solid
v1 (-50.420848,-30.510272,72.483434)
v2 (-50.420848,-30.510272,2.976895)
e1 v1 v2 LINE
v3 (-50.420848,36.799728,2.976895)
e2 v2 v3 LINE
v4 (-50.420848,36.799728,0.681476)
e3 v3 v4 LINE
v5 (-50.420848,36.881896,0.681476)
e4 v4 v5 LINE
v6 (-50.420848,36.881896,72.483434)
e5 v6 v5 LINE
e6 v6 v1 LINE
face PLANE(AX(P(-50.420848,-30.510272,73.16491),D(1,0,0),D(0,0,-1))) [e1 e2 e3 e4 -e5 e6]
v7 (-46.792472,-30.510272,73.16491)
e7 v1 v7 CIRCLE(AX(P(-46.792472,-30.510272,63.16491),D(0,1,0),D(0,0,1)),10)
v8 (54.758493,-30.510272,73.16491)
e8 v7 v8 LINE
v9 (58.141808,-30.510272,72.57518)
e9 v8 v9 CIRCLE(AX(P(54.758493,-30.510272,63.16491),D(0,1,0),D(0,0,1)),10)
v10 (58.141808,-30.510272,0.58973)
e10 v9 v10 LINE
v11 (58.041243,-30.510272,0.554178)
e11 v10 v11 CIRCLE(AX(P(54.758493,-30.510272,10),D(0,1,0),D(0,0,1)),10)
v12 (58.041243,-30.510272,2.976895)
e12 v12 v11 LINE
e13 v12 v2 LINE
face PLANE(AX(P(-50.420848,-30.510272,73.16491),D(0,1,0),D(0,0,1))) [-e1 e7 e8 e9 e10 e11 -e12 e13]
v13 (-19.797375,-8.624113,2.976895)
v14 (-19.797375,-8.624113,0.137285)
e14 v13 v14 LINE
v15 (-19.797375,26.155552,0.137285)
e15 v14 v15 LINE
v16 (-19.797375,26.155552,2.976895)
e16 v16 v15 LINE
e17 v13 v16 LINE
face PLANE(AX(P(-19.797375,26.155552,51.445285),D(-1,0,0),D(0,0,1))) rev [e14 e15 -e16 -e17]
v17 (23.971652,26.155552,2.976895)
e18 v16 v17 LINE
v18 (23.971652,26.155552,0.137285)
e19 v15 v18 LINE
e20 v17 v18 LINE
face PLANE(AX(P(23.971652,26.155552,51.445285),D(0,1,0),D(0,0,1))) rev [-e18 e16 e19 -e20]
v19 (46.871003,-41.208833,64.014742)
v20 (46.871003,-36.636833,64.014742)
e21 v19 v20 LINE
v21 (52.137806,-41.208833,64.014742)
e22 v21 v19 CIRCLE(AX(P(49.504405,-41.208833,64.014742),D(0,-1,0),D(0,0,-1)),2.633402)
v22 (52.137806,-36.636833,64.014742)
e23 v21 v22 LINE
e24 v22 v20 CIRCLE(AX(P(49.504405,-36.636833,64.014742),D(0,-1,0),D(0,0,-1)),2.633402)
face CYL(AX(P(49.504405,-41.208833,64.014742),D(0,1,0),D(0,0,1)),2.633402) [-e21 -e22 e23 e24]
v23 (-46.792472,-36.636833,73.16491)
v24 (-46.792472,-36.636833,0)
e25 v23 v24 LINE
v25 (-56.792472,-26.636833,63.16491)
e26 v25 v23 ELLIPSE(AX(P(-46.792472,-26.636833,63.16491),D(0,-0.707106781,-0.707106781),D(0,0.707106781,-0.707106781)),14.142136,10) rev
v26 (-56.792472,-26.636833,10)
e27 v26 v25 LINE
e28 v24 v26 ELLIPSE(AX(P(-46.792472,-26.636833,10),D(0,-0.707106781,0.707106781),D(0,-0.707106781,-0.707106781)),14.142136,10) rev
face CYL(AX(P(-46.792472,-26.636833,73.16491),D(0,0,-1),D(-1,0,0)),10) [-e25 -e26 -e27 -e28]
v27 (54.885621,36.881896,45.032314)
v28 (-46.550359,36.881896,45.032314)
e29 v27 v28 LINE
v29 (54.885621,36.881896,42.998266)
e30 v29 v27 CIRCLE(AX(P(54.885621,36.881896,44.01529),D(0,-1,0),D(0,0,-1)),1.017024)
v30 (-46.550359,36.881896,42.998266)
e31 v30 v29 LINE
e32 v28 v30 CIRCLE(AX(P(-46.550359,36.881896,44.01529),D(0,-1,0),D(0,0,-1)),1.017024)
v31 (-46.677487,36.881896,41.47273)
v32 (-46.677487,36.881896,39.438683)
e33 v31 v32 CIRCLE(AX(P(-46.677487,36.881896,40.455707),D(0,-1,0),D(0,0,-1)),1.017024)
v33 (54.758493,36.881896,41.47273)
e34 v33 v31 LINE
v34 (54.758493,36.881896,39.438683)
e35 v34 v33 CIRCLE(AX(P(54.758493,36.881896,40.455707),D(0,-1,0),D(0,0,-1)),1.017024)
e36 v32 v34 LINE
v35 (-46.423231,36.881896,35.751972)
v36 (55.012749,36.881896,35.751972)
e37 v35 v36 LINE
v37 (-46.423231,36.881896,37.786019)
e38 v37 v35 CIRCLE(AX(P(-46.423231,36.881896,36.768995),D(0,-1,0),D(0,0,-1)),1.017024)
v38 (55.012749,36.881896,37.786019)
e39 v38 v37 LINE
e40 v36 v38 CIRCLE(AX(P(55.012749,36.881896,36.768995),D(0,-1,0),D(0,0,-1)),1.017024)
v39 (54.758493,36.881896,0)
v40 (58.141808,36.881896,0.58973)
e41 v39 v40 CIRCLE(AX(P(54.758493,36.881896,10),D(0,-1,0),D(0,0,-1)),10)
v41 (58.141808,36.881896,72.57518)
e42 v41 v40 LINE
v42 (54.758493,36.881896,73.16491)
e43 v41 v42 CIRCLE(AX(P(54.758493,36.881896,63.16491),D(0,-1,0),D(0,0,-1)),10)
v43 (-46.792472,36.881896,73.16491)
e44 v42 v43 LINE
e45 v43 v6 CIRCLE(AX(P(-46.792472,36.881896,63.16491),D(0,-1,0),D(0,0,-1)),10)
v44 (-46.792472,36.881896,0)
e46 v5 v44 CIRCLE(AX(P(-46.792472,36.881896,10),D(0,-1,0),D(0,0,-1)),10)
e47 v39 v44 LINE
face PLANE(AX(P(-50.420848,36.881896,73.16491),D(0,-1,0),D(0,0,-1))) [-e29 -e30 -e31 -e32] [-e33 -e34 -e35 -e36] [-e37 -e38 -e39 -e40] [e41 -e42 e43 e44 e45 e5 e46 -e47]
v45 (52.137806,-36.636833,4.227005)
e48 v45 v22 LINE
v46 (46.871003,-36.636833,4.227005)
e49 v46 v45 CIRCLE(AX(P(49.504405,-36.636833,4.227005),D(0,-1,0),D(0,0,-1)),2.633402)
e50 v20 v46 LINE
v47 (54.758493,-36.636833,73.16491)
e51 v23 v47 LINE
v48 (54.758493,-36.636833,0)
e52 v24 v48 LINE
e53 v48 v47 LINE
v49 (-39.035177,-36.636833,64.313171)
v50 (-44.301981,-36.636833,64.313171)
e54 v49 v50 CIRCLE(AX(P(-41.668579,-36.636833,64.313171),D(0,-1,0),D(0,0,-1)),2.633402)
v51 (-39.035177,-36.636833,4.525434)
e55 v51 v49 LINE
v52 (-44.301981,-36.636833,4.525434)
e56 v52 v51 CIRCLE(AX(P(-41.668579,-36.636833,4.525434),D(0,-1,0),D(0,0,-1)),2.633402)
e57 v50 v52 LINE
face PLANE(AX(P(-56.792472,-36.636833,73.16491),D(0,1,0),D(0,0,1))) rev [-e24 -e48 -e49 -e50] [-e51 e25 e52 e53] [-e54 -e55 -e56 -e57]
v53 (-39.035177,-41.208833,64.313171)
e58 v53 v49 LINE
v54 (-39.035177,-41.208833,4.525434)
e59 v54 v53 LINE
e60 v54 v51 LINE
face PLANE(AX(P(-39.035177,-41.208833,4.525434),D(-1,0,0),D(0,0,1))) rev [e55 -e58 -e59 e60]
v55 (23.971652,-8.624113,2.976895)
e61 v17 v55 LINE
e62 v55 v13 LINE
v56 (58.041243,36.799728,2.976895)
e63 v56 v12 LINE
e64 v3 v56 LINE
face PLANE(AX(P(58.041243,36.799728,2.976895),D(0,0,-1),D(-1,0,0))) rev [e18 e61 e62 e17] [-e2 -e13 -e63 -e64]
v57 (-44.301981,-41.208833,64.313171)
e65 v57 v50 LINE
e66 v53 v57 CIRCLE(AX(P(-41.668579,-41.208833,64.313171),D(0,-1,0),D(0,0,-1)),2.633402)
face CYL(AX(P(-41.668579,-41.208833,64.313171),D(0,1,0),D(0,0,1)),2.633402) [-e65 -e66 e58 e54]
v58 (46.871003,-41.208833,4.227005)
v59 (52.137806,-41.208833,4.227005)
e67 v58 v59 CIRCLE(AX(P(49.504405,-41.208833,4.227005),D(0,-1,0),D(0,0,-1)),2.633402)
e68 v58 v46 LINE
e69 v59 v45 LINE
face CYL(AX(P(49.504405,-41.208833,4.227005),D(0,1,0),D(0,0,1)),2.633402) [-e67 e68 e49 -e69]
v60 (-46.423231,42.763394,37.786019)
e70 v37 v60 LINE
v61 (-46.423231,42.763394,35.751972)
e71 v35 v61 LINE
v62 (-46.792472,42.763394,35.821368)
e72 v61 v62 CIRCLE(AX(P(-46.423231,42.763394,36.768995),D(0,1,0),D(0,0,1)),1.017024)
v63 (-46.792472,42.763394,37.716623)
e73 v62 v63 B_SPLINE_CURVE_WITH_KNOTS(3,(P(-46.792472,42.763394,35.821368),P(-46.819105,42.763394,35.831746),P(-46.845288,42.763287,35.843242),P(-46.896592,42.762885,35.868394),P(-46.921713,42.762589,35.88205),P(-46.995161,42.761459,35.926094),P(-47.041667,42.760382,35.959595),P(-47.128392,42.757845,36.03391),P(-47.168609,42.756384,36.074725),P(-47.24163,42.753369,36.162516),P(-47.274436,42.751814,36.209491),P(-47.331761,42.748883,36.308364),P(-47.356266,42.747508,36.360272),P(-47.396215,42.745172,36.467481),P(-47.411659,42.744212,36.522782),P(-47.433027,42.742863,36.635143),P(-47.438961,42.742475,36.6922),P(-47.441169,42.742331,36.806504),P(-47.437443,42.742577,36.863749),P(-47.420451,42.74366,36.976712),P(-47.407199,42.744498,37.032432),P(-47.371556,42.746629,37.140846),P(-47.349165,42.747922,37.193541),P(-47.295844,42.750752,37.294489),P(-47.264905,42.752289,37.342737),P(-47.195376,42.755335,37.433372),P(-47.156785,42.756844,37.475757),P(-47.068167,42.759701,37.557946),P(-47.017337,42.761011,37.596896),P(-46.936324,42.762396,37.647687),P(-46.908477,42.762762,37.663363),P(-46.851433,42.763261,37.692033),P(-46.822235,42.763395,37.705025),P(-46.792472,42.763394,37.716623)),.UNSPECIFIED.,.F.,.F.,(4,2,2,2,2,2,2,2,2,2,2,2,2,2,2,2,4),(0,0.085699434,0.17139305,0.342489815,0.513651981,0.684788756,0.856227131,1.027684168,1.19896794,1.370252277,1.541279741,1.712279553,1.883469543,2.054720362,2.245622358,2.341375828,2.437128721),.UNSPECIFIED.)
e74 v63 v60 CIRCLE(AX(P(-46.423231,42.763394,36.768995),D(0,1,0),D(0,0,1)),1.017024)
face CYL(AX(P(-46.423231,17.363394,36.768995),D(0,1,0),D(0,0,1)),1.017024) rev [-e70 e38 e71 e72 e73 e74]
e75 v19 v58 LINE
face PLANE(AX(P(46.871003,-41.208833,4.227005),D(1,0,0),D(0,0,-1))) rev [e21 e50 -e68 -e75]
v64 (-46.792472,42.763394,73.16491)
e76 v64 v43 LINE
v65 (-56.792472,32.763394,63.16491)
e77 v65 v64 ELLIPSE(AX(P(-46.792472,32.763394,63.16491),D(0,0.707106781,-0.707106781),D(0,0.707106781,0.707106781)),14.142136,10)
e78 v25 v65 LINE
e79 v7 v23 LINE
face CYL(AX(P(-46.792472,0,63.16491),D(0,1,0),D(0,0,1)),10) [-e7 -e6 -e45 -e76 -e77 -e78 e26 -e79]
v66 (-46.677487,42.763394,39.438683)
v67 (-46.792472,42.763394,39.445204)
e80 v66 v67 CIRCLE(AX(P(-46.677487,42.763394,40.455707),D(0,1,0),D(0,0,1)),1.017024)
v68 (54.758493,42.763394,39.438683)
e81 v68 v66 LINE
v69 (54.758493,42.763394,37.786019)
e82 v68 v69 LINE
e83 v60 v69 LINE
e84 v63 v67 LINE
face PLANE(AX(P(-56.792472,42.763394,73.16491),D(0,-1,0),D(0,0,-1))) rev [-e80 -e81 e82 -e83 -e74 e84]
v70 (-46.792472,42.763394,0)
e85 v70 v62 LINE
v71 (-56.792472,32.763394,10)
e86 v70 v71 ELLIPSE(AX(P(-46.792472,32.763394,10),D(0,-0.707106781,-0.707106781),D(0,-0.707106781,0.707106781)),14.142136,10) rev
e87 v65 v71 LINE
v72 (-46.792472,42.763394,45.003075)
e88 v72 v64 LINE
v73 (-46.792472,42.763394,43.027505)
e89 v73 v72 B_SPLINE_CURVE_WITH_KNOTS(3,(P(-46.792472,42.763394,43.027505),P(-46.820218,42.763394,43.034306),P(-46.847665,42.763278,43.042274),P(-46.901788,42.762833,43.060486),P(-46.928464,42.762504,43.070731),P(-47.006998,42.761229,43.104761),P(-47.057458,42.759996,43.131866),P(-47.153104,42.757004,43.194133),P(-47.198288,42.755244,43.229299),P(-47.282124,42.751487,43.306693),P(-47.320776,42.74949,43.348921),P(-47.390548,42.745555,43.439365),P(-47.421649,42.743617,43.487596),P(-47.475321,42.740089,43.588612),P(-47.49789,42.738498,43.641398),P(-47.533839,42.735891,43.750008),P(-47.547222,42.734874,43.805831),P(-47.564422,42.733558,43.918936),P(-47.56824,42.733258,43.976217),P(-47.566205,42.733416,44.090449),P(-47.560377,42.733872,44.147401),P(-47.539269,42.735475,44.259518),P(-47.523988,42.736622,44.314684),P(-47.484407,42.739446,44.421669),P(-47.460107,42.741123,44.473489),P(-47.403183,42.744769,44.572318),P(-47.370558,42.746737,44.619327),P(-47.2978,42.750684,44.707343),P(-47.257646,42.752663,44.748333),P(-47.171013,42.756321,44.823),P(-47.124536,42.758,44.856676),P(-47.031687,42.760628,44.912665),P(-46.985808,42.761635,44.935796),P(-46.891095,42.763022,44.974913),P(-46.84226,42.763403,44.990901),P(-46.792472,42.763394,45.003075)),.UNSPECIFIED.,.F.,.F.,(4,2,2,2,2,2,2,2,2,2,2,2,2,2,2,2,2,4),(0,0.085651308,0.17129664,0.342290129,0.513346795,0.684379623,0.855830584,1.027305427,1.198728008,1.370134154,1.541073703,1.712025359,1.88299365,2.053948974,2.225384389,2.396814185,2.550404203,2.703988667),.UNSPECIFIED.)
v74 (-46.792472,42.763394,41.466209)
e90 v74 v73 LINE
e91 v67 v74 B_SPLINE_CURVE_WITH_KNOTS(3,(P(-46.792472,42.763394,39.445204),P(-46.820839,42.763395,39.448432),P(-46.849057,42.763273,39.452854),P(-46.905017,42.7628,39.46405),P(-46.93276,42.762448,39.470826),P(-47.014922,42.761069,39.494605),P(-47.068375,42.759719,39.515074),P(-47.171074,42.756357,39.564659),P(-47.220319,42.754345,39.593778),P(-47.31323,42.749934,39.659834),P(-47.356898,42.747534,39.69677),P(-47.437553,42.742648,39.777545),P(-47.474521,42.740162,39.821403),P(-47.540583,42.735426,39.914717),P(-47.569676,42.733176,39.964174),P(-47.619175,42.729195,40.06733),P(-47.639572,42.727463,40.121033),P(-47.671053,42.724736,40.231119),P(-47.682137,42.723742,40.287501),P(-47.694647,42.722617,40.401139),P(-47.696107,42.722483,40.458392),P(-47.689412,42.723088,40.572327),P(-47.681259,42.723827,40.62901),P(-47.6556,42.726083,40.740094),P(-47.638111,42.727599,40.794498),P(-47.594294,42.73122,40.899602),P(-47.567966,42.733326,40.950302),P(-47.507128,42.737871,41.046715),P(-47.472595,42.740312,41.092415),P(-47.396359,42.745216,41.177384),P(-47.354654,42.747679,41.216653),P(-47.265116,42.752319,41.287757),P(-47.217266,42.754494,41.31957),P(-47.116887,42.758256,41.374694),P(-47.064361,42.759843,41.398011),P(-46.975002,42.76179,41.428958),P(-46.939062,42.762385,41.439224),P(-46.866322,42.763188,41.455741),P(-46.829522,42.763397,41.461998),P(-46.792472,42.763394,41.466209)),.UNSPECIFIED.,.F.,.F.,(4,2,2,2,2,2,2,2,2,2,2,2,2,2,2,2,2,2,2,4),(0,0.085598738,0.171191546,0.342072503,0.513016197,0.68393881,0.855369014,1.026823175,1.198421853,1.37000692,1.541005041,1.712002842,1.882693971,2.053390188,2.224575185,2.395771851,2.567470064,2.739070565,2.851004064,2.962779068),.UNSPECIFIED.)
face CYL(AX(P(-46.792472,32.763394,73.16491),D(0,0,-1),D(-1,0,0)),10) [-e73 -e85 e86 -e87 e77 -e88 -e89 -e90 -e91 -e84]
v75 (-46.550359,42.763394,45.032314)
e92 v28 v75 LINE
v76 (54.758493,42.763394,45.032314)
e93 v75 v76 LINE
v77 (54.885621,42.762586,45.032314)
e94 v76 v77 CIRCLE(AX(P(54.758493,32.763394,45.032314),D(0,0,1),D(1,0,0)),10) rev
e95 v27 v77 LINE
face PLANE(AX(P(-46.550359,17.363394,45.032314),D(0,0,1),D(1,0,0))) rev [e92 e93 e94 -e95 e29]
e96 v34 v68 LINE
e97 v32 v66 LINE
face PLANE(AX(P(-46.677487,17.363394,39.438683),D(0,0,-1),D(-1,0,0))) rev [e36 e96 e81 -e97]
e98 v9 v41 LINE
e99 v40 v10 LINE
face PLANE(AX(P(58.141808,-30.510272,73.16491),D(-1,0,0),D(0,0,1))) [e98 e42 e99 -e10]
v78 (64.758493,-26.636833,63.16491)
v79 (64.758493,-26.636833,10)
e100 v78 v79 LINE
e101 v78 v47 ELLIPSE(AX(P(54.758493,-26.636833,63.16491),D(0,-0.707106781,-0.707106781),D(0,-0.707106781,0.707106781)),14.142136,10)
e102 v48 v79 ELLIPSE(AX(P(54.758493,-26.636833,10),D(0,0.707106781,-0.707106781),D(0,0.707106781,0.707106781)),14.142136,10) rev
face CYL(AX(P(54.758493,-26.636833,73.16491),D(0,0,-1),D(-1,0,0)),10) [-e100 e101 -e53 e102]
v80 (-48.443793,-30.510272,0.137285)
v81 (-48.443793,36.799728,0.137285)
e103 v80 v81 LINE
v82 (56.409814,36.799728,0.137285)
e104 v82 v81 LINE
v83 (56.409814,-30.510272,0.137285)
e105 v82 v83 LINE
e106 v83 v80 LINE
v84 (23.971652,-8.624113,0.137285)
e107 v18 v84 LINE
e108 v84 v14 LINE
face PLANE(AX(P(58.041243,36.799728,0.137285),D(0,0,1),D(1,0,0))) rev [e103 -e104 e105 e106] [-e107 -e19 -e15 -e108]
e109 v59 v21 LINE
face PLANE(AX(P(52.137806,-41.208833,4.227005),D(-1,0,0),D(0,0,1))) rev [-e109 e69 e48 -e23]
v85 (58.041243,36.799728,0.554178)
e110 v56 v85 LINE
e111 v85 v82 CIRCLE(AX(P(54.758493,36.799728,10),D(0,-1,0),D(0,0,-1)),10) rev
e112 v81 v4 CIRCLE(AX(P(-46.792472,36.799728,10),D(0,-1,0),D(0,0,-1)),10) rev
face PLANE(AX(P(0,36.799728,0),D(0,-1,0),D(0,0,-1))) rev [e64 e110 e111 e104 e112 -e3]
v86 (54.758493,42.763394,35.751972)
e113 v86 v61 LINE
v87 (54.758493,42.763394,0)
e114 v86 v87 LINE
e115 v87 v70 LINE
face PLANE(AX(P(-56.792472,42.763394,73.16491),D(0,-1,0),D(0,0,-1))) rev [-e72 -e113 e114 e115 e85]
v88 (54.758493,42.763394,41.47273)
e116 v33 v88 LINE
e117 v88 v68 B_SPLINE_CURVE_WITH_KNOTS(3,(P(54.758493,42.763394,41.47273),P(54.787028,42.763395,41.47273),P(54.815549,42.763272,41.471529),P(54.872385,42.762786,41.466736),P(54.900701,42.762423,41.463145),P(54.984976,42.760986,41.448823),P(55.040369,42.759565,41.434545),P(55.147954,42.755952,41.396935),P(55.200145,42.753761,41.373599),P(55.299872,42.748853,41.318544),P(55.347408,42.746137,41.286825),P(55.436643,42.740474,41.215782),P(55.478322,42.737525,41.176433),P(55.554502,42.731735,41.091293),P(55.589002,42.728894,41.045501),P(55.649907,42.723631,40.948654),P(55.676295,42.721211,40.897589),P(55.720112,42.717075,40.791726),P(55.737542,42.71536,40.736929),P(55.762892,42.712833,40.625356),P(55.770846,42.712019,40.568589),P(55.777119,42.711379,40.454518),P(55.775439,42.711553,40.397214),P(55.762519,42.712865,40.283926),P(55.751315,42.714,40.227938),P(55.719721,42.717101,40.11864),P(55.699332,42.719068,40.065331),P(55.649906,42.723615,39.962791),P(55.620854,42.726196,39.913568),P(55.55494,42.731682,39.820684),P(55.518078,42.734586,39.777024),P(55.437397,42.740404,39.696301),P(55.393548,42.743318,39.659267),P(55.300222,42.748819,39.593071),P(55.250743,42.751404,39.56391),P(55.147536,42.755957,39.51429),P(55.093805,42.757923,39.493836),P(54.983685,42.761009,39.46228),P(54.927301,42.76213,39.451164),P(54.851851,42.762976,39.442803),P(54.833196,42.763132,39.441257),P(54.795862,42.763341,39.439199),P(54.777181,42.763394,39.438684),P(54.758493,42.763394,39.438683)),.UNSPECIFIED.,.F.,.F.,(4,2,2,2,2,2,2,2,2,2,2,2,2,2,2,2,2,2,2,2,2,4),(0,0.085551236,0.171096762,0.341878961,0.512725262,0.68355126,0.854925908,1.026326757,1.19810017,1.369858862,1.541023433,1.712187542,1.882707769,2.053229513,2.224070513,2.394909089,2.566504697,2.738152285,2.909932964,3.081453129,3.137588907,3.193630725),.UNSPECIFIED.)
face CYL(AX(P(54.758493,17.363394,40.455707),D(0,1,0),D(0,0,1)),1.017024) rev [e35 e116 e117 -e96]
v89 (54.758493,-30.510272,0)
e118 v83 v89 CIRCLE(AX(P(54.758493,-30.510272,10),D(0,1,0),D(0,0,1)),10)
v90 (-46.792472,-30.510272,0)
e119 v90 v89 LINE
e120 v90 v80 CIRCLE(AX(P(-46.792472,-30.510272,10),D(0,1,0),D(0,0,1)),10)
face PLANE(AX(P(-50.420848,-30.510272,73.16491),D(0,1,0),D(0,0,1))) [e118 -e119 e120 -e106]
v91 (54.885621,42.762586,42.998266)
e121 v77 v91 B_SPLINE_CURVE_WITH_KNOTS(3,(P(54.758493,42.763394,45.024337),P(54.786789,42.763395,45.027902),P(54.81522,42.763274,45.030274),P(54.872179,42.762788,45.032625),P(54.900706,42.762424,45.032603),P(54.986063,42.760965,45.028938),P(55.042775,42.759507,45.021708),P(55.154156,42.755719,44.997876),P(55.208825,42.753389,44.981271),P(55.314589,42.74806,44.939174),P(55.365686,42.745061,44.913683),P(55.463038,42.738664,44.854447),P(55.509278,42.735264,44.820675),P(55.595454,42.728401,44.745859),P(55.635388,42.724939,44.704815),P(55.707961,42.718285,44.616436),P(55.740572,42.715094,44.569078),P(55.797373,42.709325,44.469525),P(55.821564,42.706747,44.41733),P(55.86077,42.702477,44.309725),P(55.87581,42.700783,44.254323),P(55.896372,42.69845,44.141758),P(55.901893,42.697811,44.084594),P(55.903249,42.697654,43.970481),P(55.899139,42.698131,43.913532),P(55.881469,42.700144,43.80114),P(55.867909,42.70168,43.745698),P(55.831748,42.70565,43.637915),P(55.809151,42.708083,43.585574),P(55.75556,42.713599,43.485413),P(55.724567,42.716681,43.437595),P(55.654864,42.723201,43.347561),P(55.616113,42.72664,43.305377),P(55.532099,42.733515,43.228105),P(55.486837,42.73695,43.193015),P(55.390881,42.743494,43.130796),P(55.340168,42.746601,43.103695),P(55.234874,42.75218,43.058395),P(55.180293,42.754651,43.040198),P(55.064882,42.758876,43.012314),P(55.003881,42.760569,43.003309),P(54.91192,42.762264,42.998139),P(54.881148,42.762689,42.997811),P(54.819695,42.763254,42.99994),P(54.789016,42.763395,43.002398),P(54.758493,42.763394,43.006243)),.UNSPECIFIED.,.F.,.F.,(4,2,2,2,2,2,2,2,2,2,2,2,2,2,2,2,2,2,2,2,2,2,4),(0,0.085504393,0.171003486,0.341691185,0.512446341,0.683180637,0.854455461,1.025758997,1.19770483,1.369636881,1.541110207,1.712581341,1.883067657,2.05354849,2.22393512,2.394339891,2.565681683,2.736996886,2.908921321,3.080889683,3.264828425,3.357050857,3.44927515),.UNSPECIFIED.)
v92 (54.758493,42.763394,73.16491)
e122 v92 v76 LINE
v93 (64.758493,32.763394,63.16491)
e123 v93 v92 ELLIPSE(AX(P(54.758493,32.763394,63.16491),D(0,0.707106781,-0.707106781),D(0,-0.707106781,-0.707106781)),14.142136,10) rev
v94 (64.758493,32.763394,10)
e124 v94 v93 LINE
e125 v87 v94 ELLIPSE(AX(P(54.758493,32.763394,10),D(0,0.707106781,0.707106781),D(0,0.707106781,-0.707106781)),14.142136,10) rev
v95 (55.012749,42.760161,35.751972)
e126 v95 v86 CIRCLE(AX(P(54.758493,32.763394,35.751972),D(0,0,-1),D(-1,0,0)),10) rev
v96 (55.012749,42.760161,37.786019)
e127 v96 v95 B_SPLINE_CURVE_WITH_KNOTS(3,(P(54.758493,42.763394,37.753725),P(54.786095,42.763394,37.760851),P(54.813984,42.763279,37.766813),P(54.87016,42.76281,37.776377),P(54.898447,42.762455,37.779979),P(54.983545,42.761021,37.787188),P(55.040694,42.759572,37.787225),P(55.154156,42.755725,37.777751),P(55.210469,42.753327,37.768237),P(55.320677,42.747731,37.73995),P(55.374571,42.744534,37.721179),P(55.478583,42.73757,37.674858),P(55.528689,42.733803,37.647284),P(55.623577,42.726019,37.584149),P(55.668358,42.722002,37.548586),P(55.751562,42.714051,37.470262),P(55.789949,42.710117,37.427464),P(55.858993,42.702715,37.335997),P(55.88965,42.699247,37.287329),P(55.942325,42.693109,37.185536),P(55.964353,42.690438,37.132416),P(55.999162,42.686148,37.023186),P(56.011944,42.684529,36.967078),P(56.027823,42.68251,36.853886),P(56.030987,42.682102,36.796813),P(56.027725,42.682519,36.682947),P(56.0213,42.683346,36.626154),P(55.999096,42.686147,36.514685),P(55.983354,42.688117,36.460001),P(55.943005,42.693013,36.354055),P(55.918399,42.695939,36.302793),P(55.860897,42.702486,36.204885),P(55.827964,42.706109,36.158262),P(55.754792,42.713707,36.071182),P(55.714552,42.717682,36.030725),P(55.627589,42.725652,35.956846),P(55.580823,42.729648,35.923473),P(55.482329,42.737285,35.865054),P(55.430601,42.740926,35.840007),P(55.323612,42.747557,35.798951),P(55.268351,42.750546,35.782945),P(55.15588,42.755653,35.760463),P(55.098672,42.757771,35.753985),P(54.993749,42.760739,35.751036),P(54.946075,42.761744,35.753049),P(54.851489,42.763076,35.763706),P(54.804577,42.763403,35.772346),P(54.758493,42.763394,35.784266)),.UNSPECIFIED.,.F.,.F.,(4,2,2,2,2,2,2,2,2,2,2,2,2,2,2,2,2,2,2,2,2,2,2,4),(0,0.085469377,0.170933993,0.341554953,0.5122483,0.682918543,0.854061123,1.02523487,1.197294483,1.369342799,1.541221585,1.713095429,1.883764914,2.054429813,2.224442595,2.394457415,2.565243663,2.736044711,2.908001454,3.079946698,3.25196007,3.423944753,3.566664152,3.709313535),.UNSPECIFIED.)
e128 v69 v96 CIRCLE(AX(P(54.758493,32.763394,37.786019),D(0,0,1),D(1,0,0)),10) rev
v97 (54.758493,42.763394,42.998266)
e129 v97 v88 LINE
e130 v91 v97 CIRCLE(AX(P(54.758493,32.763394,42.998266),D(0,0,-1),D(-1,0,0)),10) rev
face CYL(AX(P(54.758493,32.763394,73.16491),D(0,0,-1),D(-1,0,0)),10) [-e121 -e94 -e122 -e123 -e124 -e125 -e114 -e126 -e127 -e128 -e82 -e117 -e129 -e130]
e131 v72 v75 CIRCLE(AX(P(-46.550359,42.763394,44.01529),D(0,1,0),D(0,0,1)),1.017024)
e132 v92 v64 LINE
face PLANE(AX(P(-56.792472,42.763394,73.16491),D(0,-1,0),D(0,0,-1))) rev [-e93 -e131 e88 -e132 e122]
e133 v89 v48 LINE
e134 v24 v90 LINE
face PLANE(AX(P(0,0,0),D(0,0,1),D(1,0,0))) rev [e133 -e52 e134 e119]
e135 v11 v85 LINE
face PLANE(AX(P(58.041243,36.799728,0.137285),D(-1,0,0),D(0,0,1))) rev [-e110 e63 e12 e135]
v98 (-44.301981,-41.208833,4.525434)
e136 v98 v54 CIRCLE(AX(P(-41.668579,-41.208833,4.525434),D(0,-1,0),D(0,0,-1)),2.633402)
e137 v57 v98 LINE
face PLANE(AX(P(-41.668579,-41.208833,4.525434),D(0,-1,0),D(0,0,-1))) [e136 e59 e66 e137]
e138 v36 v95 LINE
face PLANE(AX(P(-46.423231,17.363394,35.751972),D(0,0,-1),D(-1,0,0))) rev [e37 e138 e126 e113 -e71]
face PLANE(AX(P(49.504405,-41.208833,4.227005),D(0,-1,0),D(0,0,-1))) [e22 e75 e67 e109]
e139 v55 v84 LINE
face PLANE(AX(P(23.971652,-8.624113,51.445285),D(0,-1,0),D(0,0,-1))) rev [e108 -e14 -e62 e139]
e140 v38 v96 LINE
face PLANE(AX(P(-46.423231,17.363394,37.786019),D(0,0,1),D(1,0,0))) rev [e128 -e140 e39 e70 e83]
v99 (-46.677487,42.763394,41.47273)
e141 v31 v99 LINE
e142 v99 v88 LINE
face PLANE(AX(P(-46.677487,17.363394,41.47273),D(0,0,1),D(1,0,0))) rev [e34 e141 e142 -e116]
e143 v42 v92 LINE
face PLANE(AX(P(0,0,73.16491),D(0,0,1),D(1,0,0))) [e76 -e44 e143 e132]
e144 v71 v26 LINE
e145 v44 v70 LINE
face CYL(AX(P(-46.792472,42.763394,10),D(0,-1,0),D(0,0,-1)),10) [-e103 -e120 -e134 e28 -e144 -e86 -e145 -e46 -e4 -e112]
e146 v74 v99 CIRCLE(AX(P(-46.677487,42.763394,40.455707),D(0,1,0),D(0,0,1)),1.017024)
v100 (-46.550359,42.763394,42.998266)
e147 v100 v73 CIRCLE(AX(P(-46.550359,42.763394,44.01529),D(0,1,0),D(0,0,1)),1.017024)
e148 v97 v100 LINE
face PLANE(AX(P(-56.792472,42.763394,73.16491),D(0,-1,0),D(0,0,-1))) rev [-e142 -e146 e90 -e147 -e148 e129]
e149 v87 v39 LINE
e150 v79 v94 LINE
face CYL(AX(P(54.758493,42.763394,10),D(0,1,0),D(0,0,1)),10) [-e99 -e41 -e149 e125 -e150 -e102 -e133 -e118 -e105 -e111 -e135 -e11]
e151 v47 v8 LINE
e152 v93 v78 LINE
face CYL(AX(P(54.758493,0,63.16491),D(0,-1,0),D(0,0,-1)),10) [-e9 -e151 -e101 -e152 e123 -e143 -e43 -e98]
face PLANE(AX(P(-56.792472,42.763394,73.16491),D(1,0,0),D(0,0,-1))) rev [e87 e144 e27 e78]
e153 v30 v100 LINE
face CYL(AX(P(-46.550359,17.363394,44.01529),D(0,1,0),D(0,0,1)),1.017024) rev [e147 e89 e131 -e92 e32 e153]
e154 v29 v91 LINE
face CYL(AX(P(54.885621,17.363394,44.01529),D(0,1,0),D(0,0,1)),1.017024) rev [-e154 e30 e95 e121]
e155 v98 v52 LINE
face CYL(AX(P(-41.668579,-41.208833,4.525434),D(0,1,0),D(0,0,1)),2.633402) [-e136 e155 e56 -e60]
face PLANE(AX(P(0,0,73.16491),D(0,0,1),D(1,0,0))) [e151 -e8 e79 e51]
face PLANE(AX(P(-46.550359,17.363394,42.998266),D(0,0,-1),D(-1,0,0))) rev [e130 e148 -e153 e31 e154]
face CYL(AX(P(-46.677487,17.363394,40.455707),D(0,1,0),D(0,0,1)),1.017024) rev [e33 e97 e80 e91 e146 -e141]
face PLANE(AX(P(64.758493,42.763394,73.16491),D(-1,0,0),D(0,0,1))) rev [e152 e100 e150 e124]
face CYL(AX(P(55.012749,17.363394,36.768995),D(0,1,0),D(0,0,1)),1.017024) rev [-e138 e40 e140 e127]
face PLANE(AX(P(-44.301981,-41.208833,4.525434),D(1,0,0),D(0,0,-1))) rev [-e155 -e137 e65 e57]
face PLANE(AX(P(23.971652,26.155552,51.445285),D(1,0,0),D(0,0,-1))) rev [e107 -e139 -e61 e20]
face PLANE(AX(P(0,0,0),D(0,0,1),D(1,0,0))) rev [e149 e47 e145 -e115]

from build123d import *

# Parameters (mm, degrees)
IZIM1_W                     = 121.550964813
IZIM1_H                     = 79.400227015
IZIM1_W_2                   = 108.562656073
IZIM1_H_2                   = 67.392167991
Y_KSEKLIK_EKSTR_ZYON1_DEPTH = 73.164910278
IZIM2_W                     = 108.665778405
IZIM2_H                     = 2.839609685
Y_KSEKLIK_EKSTR_ZYON3_DEPTH = 67.31
IZIM4_W                     = 43.769026383
IZIM4_H                     = 34.779664875
KES_EKSTR_ZYON3_DEPTH       = 51.308
RADYUS1_R                   = 10
RADYUS2_R                   = 10
KES_EKSTR_ZYON6_DEPTH       = 25.4
Y_KSEKLIK_EKSTR_ZYON4_DEPTH = 4.572


with BuildPart() as part:
    # Çizim1 → Yükseklik-Ekstrüzyon1 (new body)
    with BuildSketch(Plane.XY):
        with Locations((3.983010787, 3.063280364)):
            Rectangle(IZIM1_W, IZIM1_H)
        with Locations((3.860479571, 3.185811577)):
            Rectangle(IZIM1_W_2, IZIM1_H_2, mode=Mode.SUBTRACT)
    extrude(amount=Y_KSEKLIK_EKSTR_ZYON1_DEPTH)

    # Çizim2 → Yükseklik-Ekstrüzyon3 (add)
    with BuildSketch(Plane(origin=(0, -30.510272418, 0), x_dir=(1, 0, 0), z_dir=(0, 1, 0))):
        with Locations((3.70835341, -1.557090266)):
            Rectangle(IZIM2_W, IZIM2_H)
    extrude(amount=Y_KSEKLIK_EKSTR_ZYON3_DEPTH)

    # Çizim4 → Kes-Ekstrüzyon3 (cut)
    with BuildSketch(Plane(origin=(0, 0, 0.137285424), x_dir=(-1, 0, 0), z_dir=(0, 0, -1))):
        with Locations((-2.08713858, 8.765719608)):
            Rectangle(IZIM4_W, IZIM4_H)
    extrude(amount=-KES_EKSTR_ZYON3_DEPTH, mode=Mode.SUBTRACT)

    # Radyus1
    # the kernel refuses this fillet: 10 mm, written as the material it takes off along each edge
    with BuildSketch(Plane(origin=(64.758493193, -36.636833144, -25), x_dir=(0, 1, 0), z_dir=(0, 0, 1)), Plane(origin=(64.758493193, 42.763393871, -25), x_dir=(-1, 0, 0), z_dir=(0, 0, 1))) as radyus1_piece_1:
        with BuildLine():
            CenterArc((RADYUS1_R, RADYUS1_R), RADYUS1_R, 180, 90)
            Line((0, RADYUS1_R), (0, 0))
            Line((0, 0), (RADYUS1_R, 0))
        make_face()
    extrude(amount=123.164910278, mode=Mode.SUBTRACT)
    with BuildSketch(Plane(origin=(64.758493193, 67.763393871, 73.164910278), x_dir=(0, 0, -1), z_dir=(0, -1, 0))) as radyus1_piece_2:
        with BuildLine():
            CenterArc((RADYUS1_R, -RADYUS1_R), RADYUS1_R, 90, 90)
            Line((0, -RADYUS1_R), (0, 0))
            Line((0, 0), (RADYUS1_R, 0))
        make_face()
    extrude(amount=129.400227015, mode=Mode.SUBTRACT)
    with BuildSketch(Plane(origin=(64.758493193, 67.763393871, 0), x_dir=(0, 0, 1), z_dir=(0, -1, 0))) as radyus1_piece_3:
        with BuildLine():
            CenterArc((RADYUS1_R, RADYUS1_R), RADYUS1_R, 180, 90)
            Line((0, RADYUS1_R), (0, 0))
            Line((0, 0), (RADYUS1_R, 0))
        make_face()
    extrude(amount=129.400227015, mode=Mode.SUBTRACT)

    # Radyus2
    # the kernel refuses this fillet: 10 mm, written as the material it takes off along each edge
    with BuildSketch(Plane(origin=(-56.79247162, 42.763393871, -25), x_dir=(1, 0, 0), z_dir=(0, 0, 1)), Plane(origin=(-56.79247162, -36.636833144, -25), x_dir=(0, 1, 0), z_dir=(0, 0, 1))) as radyus2_piece_1:
        with BuildLine():
            CenterArc((RADYUS2_R, -RADYUS2_R), RADYUS2_R, 90, 90)
            Line((0, -RADYUS2_R), (0, 0))
            Line((0, 0), (RADYUS2_R, 0))
        make_face()
    extrude(amount=123.164910278, mode=Mode.SUBTRACT)
    with BuildSketch(Plane(origin=(-56.79247162, -61.636833144, 73.164910278), x_dir=(1, 0, 0), z_dir=(0, 1, 0))) as radyus2_piece_2:
        with BuildLine():
            CenterArc((RADYUS2_R, RADYUS2_R), RADYUS2_R, 180, 90)
            Line((0, RADYUS2_R), (0, 0))
            Line((0, 0), (RADYUS2_R, 0))
        make_face()
    extrude(amount=129.400227015, mode=Mode.SUBTRACT)
    with BuildSketch(Plane(origin=(-56.79247162, -61.636833144, 0), x_dir=(1, 0, 0), z_dir=(0, 1, 0))) as radyus2_piece_3:
        with BuildLine():
            CenterArc((RADYUS2_R, -RADYUS2_R), RADYUS2_R, 90, 90)
            Line((0, -RADYUS2_R), (0, 0))
            Line((0, 0), (RADYUS2_R, 0))
        make_face()
    extrude(amount=129.400227015, mode=Mode.SUBTRACT)

    # Çizim5 → Kes-Ekstrüzyon6 (cut)
    with BuildSketch(Plane(origin=(0, 42.763393871, 0), x_dir=(1, 0, 0), z_dir=(0, 1, 0))):
        with BuildLine():
            Line((-46.423230595, -35.751971692), (55.012749139, -35.751971692))
            ThreePointArc((55.012749139, -35.751971692), (56.029772925, -36.768995478), (55.012749139, -37.786019263))
            Line((55.012749139, -37.786019263), (-46.423230595, -37.786019263))
            ThreePointArc((-46.423230595, -37.786019263), (-47.44025438, -36.768995478), (-46.423230595, -35.751971692))
        make_face()
        with BuildLine():
            Line((-46.550358568, -42.998266165), (54.885621166, -42.998266165))
            ThreePointArc((54.885621166, -42.998266165), (55.902644952, -44.015289951), (54.885621166, -45.032313737))
            Line((54.885621166, -45.032313737), (-46.550358568, -45.032313737))
            ThreePointArc((-46.550358568, -45.032313737), (-47.567382354, -44.015289951), (-46.550358568, -42.998266165))
        make_face()
        with BuildLine():
            Line((-46.677486541, -39.438682915), (54.758493193, -39.438682915))
            ThreePointArc((54.758493193, -39.438682915), (55.775516978, -40.455706701), (54.758493193, -41.472730487))
            Line((54.758493193, -41.472730487), (-46.677486541, -41.472730487))
            ThreePointArc((-46.677486541, -41.472730487), (-47.694510327, -40.455706701), (-46.677486541, -39.438682915))
        make_face()
    extrude(amount=-KES_EKSTR_ZYON6_DEPTH, mode=Mode.SUBTRACT)

    # Çizim6 → Yükseklik-Ekstrüzyon4 (add)
    with BuildSketch(Plane(origin=(0, -36.636833144, 0), x_dir=(-1, 0, 0), z_dir=(0, -1, 0))):
        with BuildLine():
            Line((-46.87100271, -4.227005014), (-46.87100271, -64.014742354))
            ThreePointArc((-46.87100271, -64.014742354), (-49.504404567, -66.64814421), (-52.137806423, -64.014742354))
            Line((-52.137806423, -64.014742354), (-52.137806423, -4.227005014))
            ThreePointArc((-52.137806423, -4.227005014), (-49.504404567, -1.593603158), (-46.87100271, -4.227005014))
        make_face()
        with BuildLine():
            Line((44.301980946, -4.525434052), (44.301980946, -64.313171393))
            ThreePointArc((44.301980946, -64.313171393), (41.66857909, -66.946573249), (39.035177234, -64.313171393))
            Line((39.035177234, -64.313171393), (39.035177234, -4.525434052))
            ThreePointArc((39.035177234, -4.525434052), (41.66857909, -1.892032196), (44.301980946, -4.525434052))
        make_face()
    extrude(amount=Y_KSEKLIK_EKSTR_ZYON4_DEPTH)


solid = part.part
